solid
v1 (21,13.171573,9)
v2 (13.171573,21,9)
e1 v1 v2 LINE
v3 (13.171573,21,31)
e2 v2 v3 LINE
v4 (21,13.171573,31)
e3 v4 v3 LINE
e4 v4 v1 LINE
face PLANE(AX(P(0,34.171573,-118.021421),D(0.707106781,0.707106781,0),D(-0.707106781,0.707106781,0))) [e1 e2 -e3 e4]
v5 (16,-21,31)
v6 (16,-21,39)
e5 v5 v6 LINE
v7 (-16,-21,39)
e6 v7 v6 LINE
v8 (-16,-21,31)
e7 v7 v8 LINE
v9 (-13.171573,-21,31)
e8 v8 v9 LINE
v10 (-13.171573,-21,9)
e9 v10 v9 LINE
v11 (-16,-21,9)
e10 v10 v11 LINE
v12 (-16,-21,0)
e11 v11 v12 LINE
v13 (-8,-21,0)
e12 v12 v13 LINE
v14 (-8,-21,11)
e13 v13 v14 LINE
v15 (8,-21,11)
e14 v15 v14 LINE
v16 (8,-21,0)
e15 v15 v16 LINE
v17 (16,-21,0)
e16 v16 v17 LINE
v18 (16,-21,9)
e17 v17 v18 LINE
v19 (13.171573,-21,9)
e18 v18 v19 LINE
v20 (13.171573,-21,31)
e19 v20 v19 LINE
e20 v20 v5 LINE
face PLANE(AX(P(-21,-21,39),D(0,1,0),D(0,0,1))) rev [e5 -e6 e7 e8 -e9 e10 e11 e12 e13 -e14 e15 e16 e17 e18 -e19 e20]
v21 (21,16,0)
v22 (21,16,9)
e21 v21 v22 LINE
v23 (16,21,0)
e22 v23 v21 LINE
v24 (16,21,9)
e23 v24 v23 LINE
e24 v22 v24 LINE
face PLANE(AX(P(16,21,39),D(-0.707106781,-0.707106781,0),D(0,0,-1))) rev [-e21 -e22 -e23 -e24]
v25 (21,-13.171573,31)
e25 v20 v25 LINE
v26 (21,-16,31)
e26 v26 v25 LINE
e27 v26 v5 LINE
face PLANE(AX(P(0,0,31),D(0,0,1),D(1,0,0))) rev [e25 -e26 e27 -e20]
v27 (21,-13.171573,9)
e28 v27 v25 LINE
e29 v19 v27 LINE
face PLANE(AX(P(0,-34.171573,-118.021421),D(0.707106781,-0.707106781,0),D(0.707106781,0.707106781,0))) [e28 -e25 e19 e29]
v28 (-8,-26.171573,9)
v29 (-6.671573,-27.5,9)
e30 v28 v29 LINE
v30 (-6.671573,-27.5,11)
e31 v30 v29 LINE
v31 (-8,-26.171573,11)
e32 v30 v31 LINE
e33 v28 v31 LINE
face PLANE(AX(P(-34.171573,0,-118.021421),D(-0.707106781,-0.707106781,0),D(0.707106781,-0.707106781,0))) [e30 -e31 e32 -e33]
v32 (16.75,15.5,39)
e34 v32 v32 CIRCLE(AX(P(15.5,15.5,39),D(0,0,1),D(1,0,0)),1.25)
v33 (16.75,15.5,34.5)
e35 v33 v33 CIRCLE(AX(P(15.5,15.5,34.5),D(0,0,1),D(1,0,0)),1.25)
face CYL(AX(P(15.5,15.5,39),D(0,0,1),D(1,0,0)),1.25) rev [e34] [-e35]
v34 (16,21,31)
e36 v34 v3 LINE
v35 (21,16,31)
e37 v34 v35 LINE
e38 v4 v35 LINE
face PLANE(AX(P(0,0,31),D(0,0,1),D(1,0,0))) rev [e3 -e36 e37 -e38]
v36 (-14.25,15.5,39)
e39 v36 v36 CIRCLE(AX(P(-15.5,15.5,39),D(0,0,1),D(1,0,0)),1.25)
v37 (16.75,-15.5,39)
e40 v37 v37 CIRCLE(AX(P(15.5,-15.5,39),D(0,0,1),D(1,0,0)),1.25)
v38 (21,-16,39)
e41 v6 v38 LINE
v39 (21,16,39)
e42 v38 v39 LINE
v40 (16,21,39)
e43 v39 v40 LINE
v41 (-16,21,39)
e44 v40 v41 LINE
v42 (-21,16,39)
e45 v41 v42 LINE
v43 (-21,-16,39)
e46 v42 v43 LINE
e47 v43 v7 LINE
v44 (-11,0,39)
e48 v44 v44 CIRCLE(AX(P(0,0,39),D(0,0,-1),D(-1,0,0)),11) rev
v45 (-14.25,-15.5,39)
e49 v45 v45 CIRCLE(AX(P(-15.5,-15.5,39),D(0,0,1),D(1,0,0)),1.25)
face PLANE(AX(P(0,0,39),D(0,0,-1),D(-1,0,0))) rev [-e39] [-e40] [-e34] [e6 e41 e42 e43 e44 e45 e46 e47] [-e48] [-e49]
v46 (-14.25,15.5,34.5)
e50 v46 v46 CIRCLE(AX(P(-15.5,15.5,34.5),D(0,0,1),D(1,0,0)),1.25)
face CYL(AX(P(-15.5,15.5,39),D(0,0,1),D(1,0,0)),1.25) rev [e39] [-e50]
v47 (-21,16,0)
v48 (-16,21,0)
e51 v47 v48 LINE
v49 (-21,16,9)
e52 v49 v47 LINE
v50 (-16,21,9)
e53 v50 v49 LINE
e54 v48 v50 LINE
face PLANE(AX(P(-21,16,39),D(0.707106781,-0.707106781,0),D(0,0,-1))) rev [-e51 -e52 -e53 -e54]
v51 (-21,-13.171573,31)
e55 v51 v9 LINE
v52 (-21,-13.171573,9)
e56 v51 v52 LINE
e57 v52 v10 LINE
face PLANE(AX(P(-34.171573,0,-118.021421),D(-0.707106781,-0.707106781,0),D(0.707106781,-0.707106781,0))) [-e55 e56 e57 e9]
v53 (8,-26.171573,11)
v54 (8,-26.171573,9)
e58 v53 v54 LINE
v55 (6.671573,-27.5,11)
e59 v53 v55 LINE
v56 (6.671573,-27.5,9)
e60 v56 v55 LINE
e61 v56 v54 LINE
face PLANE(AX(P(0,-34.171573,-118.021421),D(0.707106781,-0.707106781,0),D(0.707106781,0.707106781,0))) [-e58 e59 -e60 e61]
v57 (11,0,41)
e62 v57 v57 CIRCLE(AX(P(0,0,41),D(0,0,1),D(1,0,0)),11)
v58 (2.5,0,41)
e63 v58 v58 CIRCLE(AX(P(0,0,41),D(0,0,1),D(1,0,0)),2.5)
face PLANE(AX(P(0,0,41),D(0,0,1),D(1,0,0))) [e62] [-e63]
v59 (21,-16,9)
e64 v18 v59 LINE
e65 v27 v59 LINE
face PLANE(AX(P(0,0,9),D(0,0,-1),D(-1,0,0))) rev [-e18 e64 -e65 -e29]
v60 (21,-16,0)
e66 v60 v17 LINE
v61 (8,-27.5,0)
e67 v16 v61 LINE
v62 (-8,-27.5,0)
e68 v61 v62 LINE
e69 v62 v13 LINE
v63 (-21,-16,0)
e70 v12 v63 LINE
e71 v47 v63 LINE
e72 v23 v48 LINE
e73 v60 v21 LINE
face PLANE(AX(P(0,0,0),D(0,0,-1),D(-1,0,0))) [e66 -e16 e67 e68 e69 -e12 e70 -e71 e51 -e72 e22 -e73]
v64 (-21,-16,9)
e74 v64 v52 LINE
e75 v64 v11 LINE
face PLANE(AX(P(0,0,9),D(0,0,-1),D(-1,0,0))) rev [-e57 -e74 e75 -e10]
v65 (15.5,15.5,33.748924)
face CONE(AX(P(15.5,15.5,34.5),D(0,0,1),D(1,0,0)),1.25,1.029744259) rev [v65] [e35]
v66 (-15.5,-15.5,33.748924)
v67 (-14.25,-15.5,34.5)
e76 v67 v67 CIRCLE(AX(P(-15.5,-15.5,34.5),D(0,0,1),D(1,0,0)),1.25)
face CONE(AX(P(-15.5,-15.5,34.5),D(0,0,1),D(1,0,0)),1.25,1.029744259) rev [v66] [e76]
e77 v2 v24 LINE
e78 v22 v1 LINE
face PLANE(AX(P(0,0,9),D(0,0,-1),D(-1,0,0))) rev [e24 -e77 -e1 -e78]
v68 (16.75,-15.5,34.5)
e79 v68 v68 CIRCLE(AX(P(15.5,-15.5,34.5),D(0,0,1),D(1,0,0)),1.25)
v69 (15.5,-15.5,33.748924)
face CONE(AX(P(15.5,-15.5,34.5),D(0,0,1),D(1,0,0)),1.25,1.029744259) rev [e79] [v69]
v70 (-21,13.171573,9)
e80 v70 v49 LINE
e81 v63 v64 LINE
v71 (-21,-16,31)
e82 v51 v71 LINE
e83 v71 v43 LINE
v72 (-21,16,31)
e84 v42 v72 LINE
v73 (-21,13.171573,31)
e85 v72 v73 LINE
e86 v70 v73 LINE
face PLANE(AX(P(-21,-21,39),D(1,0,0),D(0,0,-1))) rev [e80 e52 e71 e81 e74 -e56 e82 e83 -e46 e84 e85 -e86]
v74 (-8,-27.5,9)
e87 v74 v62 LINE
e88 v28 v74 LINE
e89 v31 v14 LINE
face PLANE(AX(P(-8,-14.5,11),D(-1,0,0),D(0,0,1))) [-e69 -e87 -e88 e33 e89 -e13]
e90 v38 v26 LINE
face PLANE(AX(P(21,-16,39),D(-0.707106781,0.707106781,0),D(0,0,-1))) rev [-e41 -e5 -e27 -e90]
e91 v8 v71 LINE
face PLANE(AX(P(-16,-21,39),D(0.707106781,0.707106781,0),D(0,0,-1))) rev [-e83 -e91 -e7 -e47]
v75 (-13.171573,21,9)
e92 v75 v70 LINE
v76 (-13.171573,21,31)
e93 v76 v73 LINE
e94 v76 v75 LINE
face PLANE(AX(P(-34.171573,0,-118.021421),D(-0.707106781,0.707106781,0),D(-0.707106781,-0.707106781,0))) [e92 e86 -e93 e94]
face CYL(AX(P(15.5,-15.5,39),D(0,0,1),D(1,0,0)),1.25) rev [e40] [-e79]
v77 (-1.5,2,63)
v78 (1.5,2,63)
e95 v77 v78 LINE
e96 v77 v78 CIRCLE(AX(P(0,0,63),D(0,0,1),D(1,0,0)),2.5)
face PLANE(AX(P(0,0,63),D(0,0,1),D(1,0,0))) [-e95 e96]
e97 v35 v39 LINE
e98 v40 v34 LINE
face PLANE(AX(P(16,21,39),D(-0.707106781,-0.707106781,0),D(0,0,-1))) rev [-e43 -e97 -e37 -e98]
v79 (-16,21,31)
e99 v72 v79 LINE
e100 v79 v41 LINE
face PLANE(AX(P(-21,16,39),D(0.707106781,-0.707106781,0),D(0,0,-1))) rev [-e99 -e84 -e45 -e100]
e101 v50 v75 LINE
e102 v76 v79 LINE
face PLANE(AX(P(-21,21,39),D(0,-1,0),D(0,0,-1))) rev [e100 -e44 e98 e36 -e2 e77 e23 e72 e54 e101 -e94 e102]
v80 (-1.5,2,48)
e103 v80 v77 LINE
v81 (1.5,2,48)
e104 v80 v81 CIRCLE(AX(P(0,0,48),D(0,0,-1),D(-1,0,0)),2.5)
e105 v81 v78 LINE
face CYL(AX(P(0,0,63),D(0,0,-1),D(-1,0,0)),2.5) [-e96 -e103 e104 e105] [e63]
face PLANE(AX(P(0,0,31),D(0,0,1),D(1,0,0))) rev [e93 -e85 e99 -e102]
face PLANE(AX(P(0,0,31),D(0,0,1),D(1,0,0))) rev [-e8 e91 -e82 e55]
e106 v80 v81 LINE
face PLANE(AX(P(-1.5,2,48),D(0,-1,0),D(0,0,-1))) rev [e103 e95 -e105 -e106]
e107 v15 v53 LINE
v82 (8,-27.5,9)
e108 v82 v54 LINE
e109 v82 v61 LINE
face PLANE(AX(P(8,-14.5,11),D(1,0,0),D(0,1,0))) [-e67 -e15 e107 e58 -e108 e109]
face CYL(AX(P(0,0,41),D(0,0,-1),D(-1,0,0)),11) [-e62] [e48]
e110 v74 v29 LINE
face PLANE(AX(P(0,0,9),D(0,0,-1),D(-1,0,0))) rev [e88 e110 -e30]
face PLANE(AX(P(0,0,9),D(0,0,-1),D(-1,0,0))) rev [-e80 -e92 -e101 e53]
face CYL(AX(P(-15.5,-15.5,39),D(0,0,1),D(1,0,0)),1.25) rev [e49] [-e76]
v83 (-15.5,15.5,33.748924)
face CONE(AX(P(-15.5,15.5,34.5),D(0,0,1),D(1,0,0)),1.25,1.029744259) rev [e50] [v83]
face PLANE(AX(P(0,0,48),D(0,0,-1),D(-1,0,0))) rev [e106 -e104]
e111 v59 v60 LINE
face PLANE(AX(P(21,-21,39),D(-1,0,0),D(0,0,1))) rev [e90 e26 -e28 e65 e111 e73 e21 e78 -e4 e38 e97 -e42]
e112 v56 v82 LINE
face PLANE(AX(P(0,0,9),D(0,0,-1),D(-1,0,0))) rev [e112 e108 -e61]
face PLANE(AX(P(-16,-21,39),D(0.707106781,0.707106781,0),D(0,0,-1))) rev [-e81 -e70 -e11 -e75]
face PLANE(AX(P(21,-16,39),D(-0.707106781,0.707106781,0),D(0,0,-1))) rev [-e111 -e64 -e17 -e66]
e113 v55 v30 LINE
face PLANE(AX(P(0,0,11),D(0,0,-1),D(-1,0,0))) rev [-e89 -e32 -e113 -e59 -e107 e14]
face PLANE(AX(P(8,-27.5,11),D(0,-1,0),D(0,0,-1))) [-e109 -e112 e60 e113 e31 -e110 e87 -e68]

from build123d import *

# Parameters (mm, degrees)
SKETCH1_W           = 42
SKETCH1_H           = 42
BOSS_EXTRUDE1_DEPTH = 39
CHAMFER1_SIZE       = 5
SKETCH5_R           = 11
SKETCH5_R_2         = 2.5
BOSS_EXTRUDE2_DEPTH = 2
SKETCH6_R           = 2.5
BOSS_EXTRUDE3_DEPTH = 24
SKETCH7_W           = 5.502287021
SKETCH7_H           = 7.880652758
CUT_EXTRUDE1_DEPTH  = 15
SKETCH8_W           = 16
SKETCH8_H           = 13
BOSS_EXTRUDE4_DEPTH = 11
CUT_EXTRUDE2_START  = -8
SKETCH9_W           = 84.832687132
SKETCH9_H           = 82.051636753
CUT_EXTRUDE2_DEPTH  = 22


# Read off the part's stored shape, not the designer's step: M3x0.5 Tapped Hole1
with BuildPart() as part:
    # Sketch1 → Boss-Extrude1 (new body)
    with BuildSketch(Plane.XY):
        Rectangle(SKETCH1_W, SKETCH1_H)
    extrude(amount=BOSS_EXTRUDE1_DEPTH)

    # Chamfer1
    chamfer1_edges = [part.edges().sort_by_distance(p)[0] for p in [
        (21, -21, 19.5),
        (-21, -21, 19.5),
        (-21, 21, 19.5),
        (21, 21, 19.5),
    ]]
    chamfer(chamfer1_edges, length=CHAMFER1_SIZE)

    # M3x0.5 Tapped Hole1 outline → M3x0.5 Tapped Hole1 (revolve, cut)
    with BuildSketch(Plane(origin=(15.5, 15.5, 0), x_dir=(1, 0, 0), z_dir=(0, -1, 0))):
        Polygon((0, 39), (0, 33.748924226), (1.25, 34.5), (1.25, 39), align=None)
    revolve(axis=Axis((15.5, 15.5, 0), (0, 0, 1)), mode=Mode.SUBTRACT)

    # M3x0.5 Tapped Hole1 2 outline → M3x0.5 Tapped Hole1 2 (revolve, cut)
    with BuildSketch(Plane(origin=(-15.5, -15.5, 0), x_dir=(1, 0, 0), z_dir=(0, -1, 0))):
        Polygon((0, 39), (0, 33.748924226), (1.25, 34.5), (1.25, 39), align=None)
    revolve(axis=Axis((-15.5, -15.5, 0), (0, 0, 1)), mode=Mode.SUBTRACT)

    # M3x0.5 Tapped Hole1 3 outline → M3x0.5 Tapped Hole1 3 (revolve, cut)
    with BuildSketch(Plane(origin=(-15.5, 15.5, 0), x_dir=(1, 0, 0), z_dir=(0, -1, 0))):
        Polygon((0, 39), (0, 33.748924226), (1.25, 34.5), (1.25, 39), align=None)
    revolve(axis=Axis((-15.5, 15.5, 0), (0, 0, 1)), mode=Mode.SUBTRACT)

    # M3x0.5 Tapped Hole1 4 outline → M3x0.5 Tapped Hole1 4 (revolve, cut)
    with BuildSketch(Plane(origin=(15.5, -15.5, 0), x_dir=(1, 0, 0), z_dir=(0, -1, 0))):
        Polygon((0, 39), (0, 33.748924226), (1.25, 34.5), (1.25, 39), align=None)
    revolve(axis=Axis((15.5, -15.5, 0), (0, 0, 1)), mode=Mode.SUBTRACT)

    # Sketch5 → Boss-Extrude2 (add)
    with BuildSketch(Plane.XY.offset(39)):
        with Locations(Location((0, 0, 0), (0, 0, 180))):
            Circle(SKETCH5_R)
        Circle(SKETCH5_R_2, mode=Mode.SUBTRACT)
    extrude(amount=BOSS_EXTRUDE2_DEPTH)

    # Sketch6 → Boss-Extrude3 (add)
    with BuildSketch(Plane.XY.offset(39)):
        Circle(SKETCH6_R)
    extrude(amount=BOSS_EXTRUDE3_DEPTH)

    # Sketch7 → Cut-Extrude1 (cut)
    with BuildSketch(Plane.XY.offset(63)):
        with Locations((1.25114351, 5.940326379)):
            Rectangle(SKETCH7_W, SKETCH7_H)
    extrude(amount=-CUT_EXTRUDE1_DEPTH, mode=Mode.SUBTRACT)

    # Sketch8 → Boss-Extrude4 (add)
    with BuildSketch(Plane(origin=(0, 0, 0), x_dir=(-1, 0, 0), z_dir=(0, 0, -1))):
        with Locations((0, -21)):
            Rectangle(SKETCH8_W, SKETCH8_H)
    extrude(amount=-BOSS_EXTRUDE4_DEPTH)

    # Sketch9 → Cut-Extrude2 (cut)
    with BuildSketch(Plane.XY.offset(39).offset(CUT_EXTRUDE2_START)):
        with Locations((-5.67946535, 2.529712031)):
            Rectangle(SKETCH9_W, SKETCH9_H)
        Polygon((-34.171572875, 0), (0, 34.171572875), (34.171572875, 0), (0, -34.171572875), align=None, mode=Mode.SUBTRACT)
    extrude(amount=-CUT_EXTRUDE2_DEPTH, mode=Mode.SUBTRACT)


solid = part.part
